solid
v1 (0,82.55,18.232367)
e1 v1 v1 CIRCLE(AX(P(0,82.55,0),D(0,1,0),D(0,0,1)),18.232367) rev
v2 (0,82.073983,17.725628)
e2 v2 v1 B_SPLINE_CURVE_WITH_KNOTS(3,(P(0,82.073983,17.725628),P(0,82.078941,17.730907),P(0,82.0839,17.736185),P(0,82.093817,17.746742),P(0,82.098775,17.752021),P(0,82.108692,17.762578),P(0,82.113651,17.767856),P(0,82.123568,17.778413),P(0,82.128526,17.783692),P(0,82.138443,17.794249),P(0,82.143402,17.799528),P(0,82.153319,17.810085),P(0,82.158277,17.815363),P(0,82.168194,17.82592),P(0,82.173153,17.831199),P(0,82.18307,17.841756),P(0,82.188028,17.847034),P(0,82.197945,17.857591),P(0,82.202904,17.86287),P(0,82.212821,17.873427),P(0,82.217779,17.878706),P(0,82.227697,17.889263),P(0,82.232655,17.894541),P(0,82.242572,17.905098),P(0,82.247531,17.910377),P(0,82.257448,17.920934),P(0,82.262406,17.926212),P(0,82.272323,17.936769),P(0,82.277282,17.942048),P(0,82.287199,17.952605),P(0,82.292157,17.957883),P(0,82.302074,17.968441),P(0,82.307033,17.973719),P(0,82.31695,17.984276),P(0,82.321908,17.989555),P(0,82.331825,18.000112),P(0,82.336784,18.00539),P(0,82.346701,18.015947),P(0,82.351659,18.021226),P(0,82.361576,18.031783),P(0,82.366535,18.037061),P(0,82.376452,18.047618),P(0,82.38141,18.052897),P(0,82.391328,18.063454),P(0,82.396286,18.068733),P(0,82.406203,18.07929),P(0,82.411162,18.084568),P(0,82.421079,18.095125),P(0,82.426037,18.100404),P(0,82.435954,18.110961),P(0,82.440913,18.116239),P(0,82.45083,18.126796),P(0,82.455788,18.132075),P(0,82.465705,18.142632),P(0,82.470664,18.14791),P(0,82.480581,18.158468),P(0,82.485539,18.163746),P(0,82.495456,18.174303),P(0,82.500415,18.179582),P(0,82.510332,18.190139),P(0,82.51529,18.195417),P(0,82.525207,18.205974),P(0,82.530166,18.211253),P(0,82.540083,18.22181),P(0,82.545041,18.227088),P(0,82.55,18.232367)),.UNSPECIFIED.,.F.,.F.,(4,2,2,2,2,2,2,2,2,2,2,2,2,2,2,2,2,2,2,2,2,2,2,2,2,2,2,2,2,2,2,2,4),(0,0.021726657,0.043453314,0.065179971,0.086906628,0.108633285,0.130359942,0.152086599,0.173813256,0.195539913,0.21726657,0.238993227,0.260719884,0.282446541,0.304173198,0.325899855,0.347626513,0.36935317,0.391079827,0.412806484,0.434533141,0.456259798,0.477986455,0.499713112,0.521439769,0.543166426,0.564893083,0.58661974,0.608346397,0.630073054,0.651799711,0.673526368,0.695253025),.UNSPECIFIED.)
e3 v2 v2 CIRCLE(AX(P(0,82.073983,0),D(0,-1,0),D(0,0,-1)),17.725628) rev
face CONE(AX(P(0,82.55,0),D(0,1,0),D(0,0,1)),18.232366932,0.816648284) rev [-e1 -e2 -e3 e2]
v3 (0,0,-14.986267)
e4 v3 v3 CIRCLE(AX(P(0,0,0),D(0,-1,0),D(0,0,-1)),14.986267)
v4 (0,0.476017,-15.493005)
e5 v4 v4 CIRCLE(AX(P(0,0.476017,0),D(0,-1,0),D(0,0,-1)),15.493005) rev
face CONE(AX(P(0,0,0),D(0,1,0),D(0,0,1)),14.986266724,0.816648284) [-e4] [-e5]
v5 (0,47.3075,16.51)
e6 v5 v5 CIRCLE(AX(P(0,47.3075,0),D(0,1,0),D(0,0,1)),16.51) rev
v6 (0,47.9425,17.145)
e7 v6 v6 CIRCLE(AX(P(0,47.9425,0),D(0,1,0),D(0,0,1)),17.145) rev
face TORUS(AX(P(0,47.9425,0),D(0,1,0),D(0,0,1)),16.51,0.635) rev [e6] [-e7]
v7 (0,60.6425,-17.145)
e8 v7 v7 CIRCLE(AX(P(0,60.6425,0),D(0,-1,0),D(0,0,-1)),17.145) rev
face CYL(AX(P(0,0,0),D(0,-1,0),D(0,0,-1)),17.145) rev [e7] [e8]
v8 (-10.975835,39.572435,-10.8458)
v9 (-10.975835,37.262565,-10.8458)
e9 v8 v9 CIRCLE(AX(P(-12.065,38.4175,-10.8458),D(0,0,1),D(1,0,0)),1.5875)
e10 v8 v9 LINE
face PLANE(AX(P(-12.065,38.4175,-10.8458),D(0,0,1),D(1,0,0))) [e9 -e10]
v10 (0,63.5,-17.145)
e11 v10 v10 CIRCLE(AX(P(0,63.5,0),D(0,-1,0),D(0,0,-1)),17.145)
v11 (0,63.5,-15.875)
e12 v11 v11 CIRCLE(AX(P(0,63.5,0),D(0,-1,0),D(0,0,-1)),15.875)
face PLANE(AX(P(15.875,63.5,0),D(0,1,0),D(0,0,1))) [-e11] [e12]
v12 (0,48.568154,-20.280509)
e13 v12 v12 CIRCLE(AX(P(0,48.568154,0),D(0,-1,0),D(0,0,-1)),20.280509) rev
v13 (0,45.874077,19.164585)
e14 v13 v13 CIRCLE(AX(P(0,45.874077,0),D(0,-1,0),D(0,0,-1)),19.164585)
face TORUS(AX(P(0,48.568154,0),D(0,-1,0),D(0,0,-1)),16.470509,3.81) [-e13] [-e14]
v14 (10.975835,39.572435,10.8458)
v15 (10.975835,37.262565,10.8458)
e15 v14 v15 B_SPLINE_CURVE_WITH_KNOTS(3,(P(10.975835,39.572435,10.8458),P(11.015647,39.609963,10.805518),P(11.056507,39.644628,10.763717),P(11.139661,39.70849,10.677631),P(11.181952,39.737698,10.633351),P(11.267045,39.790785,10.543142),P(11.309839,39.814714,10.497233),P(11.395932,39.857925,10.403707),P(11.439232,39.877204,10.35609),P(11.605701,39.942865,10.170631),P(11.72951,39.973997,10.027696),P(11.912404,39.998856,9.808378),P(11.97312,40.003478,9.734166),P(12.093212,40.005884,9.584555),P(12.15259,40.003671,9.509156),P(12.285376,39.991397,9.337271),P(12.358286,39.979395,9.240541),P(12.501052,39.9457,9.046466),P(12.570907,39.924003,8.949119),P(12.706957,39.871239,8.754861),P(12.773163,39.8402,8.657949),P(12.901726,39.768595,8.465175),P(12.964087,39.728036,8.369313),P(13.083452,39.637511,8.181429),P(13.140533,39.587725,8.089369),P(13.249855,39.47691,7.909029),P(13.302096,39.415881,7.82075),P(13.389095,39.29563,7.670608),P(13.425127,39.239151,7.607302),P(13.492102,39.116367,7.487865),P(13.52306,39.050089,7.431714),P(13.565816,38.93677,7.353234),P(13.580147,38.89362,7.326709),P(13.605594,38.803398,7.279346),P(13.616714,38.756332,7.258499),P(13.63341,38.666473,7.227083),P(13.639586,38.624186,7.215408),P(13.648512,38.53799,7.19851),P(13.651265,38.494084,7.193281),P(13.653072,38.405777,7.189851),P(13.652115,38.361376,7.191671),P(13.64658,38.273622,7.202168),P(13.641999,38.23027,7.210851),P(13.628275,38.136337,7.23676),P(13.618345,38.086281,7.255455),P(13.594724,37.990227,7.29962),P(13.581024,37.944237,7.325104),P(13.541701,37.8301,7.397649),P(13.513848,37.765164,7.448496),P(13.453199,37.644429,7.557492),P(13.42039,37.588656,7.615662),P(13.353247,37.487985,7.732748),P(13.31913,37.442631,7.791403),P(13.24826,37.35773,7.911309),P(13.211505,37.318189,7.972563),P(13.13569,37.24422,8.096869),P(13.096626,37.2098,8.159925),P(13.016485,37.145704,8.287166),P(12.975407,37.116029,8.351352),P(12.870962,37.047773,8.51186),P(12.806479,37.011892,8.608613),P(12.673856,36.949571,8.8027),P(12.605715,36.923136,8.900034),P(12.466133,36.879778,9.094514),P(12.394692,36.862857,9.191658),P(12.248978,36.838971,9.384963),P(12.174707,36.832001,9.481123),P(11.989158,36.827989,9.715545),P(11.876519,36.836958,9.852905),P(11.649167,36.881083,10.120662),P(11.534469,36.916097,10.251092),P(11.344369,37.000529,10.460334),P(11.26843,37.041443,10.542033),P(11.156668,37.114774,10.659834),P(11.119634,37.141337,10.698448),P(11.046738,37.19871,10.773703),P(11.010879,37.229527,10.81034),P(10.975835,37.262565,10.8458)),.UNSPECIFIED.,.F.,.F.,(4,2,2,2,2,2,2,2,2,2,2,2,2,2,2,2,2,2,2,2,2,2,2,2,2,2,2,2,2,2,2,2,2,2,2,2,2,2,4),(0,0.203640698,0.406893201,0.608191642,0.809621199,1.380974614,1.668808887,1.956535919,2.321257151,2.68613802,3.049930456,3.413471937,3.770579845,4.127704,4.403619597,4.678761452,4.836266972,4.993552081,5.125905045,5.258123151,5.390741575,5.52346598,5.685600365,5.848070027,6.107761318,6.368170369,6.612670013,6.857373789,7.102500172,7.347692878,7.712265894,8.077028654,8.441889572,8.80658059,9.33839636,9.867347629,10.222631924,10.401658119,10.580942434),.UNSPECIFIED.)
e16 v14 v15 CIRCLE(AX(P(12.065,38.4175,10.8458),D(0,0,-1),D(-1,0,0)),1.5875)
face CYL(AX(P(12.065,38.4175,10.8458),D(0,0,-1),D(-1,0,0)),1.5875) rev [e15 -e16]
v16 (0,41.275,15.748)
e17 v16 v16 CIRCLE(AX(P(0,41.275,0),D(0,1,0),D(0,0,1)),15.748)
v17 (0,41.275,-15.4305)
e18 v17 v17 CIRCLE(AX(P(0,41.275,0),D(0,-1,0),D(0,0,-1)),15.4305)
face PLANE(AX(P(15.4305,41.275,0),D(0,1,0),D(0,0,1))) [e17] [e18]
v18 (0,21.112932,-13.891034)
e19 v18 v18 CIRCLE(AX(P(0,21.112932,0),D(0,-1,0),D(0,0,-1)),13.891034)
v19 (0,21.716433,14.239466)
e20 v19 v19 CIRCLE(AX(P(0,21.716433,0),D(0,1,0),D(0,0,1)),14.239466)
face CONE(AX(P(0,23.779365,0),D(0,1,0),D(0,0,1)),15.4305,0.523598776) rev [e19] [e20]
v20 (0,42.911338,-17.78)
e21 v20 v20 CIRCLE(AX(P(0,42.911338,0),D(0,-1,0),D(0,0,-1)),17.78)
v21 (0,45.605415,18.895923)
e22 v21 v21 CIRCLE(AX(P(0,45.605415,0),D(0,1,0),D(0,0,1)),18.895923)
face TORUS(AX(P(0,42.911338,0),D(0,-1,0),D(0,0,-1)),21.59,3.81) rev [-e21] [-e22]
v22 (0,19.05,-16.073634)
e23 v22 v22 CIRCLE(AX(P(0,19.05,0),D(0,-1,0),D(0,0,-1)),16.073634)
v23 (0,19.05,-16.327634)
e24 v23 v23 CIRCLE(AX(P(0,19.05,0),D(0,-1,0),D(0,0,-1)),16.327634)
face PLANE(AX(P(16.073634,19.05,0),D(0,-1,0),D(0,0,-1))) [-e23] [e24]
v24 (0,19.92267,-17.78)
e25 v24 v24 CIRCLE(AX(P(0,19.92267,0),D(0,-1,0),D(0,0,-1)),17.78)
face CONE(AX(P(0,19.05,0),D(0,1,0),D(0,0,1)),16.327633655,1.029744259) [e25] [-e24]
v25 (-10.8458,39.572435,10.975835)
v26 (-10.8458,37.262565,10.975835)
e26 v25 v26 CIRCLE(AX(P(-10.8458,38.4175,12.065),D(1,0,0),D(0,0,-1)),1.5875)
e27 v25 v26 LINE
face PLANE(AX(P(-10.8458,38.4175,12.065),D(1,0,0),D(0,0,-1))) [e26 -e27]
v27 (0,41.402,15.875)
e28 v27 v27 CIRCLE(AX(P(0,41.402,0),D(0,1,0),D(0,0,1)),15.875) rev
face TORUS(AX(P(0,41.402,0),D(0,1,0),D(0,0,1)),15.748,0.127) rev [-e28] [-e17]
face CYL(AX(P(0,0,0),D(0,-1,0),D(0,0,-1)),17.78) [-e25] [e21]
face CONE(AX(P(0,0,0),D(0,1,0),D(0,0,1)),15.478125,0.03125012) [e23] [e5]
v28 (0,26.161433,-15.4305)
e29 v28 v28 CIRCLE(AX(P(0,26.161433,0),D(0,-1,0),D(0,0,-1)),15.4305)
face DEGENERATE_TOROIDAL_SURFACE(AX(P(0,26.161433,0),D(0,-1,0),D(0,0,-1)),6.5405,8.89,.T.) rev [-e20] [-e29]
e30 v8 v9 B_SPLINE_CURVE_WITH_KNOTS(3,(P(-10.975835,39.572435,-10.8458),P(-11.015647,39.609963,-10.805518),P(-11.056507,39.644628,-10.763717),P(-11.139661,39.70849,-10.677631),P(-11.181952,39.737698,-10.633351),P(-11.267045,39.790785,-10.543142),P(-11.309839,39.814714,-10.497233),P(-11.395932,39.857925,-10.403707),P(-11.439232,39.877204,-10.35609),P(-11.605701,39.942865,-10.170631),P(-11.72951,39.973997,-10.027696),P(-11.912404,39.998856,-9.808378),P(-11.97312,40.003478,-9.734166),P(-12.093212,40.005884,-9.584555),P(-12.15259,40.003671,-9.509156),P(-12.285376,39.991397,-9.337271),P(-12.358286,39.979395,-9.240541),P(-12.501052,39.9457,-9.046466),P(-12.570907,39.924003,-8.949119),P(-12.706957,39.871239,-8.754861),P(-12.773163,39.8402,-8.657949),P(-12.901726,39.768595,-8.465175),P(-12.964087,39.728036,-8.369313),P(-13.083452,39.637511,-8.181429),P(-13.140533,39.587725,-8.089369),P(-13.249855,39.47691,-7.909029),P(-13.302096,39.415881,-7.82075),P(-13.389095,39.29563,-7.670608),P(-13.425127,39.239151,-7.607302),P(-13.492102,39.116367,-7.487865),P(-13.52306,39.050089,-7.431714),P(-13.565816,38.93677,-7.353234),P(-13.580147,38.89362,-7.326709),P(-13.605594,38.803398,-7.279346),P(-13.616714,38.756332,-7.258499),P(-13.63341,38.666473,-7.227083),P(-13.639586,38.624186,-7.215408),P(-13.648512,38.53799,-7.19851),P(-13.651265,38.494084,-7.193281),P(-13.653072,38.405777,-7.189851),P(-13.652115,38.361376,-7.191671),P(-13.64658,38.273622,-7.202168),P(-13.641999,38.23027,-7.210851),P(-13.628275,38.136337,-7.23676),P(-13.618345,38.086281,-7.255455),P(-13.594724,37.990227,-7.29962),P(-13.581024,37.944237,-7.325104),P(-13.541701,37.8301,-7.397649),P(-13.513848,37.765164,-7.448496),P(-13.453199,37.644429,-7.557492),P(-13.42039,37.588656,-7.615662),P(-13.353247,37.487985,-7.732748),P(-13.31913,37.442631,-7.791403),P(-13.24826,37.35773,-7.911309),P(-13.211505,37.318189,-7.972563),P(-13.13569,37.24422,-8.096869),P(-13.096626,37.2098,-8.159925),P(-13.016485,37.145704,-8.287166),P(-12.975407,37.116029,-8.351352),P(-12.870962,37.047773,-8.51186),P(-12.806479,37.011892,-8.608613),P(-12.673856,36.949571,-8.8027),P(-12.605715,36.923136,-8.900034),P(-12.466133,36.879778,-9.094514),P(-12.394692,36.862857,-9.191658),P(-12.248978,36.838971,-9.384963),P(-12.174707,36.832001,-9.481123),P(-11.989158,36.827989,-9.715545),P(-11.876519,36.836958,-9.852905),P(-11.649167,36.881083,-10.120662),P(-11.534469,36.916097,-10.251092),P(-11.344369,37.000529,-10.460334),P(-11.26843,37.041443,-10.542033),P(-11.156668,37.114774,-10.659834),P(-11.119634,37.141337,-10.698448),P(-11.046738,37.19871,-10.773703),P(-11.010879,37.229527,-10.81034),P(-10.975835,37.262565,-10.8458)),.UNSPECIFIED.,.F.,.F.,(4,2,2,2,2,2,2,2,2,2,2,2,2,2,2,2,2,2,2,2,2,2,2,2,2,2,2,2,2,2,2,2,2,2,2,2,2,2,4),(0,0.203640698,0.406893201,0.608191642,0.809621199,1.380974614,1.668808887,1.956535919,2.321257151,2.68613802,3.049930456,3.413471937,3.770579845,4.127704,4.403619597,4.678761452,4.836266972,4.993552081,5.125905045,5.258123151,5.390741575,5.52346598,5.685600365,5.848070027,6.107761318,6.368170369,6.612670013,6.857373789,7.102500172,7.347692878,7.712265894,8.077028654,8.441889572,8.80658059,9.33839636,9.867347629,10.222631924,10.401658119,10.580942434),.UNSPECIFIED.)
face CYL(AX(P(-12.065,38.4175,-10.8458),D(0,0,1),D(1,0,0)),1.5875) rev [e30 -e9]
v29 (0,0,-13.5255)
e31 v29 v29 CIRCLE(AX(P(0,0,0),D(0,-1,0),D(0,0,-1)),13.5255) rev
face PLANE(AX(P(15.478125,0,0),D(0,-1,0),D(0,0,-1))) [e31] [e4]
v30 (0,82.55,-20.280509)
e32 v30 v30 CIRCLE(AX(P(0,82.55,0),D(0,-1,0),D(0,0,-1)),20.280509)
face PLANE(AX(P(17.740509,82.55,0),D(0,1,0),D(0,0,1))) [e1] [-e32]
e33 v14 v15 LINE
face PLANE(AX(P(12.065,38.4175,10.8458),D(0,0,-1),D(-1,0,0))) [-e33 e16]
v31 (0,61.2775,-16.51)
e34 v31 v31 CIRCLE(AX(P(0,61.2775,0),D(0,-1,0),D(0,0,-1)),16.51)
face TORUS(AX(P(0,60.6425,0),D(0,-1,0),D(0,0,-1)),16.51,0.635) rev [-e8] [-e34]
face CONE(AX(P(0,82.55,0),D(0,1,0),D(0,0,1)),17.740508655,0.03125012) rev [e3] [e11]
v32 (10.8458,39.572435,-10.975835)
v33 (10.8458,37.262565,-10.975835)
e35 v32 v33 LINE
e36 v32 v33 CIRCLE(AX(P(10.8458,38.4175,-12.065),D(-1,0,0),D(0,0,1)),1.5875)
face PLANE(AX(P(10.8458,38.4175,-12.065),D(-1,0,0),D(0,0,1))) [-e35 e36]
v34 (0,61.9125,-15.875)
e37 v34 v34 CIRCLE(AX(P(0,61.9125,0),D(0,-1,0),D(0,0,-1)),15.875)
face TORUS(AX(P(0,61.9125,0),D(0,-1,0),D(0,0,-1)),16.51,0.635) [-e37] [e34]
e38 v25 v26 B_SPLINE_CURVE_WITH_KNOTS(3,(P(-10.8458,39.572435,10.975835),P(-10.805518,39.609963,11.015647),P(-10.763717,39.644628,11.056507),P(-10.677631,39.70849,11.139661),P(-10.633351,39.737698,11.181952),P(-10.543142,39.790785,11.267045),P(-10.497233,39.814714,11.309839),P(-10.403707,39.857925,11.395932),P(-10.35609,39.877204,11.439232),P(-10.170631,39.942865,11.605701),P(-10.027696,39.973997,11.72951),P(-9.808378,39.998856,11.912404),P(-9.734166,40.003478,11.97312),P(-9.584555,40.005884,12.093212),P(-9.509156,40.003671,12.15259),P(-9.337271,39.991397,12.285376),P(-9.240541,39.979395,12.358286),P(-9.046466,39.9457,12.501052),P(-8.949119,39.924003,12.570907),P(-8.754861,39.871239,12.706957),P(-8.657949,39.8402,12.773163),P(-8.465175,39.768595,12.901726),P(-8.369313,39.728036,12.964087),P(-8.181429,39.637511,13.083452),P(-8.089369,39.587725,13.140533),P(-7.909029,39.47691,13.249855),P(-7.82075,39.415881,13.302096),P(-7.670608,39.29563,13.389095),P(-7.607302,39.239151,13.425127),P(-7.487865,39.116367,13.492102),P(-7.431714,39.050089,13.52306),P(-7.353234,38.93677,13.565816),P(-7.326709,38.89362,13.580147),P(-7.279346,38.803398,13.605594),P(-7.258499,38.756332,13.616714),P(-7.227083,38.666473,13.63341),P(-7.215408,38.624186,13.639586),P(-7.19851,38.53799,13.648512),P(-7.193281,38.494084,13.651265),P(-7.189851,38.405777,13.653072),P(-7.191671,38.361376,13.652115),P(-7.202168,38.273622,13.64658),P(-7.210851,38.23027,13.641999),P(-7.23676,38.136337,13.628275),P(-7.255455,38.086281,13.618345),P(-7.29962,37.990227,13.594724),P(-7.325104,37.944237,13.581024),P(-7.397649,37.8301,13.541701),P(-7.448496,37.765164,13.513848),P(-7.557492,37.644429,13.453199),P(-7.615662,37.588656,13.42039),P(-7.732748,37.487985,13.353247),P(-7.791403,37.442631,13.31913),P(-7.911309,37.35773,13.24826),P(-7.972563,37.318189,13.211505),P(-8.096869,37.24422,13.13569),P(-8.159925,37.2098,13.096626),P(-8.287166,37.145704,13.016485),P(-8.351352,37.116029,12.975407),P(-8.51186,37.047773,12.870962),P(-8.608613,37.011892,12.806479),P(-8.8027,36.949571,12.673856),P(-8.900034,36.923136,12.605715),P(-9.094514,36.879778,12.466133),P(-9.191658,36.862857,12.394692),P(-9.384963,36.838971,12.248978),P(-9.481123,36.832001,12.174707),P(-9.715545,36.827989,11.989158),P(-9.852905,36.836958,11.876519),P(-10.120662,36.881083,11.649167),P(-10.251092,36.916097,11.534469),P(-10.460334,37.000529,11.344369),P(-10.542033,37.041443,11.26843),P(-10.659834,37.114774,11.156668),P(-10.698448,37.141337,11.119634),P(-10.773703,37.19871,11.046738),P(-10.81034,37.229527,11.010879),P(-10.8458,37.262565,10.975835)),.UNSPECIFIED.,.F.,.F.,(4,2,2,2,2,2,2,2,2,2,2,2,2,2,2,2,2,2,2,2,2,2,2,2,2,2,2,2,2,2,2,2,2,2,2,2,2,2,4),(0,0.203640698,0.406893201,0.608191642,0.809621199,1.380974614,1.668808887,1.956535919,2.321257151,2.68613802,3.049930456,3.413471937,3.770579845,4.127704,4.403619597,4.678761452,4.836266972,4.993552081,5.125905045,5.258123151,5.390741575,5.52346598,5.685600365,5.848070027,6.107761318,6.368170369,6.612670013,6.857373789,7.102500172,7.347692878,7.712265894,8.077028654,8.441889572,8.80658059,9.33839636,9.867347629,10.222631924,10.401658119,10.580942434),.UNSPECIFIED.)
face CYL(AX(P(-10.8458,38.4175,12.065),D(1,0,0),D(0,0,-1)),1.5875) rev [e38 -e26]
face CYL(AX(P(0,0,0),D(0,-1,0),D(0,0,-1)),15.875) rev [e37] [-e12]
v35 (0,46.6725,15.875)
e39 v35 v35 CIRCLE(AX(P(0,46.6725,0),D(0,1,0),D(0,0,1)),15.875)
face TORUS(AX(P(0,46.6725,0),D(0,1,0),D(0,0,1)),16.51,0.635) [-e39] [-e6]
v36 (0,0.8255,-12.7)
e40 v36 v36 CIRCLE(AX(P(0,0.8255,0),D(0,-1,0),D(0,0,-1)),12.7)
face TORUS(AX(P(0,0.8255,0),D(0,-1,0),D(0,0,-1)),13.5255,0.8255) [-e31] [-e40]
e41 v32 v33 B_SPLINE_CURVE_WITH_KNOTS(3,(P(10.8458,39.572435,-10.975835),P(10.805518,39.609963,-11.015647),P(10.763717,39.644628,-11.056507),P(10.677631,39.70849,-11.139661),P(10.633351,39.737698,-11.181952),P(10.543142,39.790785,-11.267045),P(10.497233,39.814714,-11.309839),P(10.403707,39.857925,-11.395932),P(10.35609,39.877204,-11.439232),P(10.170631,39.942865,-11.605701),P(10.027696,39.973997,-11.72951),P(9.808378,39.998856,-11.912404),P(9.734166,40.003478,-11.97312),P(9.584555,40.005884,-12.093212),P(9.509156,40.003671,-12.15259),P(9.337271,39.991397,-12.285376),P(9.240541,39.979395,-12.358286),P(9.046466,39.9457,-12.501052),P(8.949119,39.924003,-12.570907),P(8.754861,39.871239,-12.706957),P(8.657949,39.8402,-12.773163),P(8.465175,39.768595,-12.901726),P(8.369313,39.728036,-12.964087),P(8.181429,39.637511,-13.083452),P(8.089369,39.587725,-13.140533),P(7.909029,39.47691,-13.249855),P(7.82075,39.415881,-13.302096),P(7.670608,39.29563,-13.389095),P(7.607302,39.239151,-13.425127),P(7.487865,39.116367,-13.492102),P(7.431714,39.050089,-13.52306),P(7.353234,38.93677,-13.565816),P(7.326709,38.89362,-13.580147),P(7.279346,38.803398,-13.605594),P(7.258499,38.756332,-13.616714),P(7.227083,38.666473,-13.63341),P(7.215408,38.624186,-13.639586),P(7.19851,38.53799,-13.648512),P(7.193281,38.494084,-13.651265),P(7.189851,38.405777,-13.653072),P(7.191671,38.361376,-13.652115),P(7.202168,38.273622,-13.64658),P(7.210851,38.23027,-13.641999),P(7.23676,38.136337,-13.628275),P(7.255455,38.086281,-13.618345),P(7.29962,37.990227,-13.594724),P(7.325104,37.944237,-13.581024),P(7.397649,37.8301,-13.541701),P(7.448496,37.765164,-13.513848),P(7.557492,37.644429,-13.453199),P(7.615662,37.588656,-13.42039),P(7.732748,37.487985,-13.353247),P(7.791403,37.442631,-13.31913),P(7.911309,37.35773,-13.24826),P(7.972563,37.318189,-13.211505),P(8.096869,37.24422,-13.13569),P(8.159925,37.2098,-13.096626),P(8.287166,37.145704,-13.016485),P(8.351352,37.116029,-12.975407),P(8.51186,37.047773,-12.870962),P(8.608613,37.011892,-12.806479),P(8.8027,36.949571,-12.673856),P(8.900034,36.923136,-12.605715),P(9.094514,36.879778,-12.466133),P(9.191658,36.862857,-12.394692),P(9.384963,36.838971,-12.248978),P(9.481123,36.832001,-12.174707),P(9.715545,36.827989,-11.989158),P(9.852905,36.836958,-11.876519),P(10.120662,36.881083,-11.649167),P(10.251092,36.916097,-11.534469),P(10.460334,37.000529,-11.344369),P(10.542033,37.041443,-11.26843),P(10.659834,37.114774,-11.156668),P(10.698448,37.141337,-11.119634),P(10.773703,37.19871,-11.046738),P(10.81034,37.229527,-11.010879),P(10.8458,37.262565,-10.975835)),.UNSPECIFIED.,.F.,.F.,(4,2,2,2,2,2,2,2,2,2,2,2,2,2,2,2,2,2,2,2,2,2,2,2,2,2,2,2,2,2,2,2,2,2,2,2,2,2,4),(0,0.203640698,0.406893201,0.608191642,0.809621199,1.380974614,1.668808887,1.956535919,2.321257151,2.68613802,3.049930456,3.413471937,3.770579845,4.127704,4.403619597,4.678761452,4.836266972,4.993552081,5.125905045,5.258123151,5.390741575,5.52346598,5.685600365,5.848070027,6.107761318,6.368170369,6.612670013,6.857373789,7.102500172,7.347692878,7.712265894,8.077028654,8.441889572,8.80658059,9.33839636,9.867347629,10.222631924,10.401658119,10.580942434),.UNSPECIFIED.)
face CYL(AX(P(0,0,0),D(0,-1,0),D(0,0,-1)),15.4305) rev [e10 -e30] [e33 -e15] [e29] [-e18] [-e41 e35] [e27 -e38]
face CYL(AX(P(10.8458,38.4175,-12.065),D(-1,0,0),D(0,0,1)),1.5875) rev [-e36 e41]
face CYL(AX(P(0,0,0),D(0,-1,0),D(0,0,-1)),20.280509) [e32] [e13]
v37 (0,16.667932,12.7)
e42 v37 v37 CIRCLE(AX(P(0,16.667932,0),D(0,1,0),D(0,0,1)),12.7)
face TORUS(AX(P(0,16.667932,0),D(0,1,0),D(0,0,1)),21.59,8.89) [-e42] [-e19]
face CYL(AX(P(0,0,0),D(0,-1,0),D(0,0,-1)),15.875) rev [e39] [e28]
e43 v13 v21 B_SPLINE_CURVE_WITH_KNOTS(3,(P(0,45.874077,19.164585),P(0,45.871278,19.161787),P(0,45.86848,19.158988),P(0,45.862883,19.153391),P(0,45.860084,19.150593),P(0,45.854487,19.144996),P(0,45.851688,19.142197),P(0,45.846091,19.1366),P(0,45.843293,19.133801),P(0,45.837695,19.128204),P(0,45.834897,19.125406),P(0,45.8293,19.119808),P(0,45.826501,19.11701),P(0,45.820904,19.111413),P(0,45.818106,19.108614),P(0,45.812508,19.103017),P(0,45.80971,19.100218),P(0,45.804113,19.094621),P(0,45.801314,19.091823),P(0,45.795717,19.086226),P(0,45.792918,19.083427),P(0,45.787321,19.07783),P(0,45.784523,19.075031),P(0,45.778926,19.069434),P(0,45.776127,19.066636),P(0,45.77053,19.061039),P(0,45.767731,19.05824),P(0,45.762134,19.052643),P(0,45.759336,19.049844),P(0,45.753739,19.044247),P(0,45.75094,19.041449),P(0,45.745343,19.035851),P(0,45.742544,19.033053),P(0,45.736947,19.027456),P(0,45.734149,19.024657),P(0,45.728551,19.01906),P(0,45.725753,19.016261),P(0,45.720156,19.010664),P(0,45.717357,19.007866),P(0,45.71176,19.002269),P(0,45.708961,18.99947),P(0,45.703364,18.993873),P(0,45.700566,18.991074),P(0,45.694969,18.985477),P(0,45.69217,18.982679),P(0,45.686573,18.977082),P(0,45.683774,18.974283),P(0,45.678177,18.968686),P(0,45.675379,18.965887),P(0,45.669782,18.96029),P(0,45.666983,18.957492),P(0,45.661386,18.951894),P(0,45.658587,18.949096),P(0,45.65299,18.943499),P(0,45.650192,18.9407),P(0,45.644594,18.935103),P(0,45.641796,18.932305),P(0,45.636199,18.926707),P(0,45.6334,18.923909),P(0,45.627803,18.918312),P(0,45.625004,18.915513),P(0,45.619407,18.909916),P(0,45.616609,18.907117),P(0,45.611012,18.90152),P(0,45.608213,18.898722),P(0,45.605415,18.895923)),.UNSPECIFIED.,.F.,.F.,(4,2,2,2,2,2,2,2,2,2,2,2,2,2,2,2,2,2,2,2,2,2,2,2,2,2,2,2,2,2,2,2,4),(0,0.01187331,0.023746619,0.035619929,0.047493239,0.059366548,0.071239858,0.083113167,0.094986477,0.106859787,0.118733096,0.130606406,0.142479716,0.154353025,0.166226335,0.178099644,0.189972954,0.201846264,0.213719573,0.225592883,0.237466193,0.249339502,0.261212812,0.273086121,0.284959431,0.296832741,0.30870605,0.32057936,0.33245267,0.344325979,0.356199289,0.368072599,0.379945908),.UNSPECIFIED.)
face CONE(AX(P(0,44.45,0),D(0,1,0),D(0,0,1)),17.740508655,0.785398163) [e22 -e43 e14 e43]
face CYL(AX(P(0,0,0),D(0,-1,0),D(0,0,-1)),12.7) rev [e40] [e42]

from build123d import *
from OCP.BRepFilletAPI import BRepFilletAPI_MakeChamfer

# Parameters (mm, degrees)
SKETCH5_R                = 1.5875
FUEL_INLET_DEPTH         = 10.8458
FUEL_INLET_PATTERN_COUNT = 4
THREAD_PREP_SIZE         = 0.47625
THREAD_PREP_SIZE2        = 0.491858276
OUTSIDE_PREP_ROUND_SIZE  = 2.54
OUTER_ROUND_R            = 3.81
INSIDE_ROUND_R           = 8.89
STEP_ROUND_R             = 0.127
GROOVE_ROUNDS_R          = 0.635
EXIT_ROUND_R             = 0.8255


# Some blends are built 0.0001 mm under size
with BuildPart() as part:
    # Sketch3 → Revolve1 (revolve)
    with BuildSketch(Plane.XY, mode=Mode.PRIVATE) as revolve1_sk:
        Polygon((15.4305, 23.77936473), (15.4305, 41.275), (15.875, 41.275), (15.875, 47.3075), (17.145, 47.3075), (17.145, 61.2775), (15.875, 61.2775), (15.875, 63.5), (17.145, 63.5), (17.740508655, 82.55), (20.280508655, 82.55), (20.280508655, 44.45), (17.78, 44.45), (17.78, 19.922669741), (16.327633655, 19.05), (16.073633655, 19.05), (15.478125, 0), (12.7, 0), (12.7, 19.05), align=None)
    revolve(revolve1_sk.sketch.rotate(Axis((0, 0, 0), (0, 1, 0)), 90), axis=Axis((0, 0, 0), (0, 1, 0)))

    # Sketch5 → Fuel-Inlet (cut)
    with BuildSketch(Plane.XY):
        with Locations((-12.065, 38.4175)):
            Circle(SKETCH5_R)
    fuel_inlet = extrude(amount=-FUEL_INLET_DEPTH, mode=Mode.SUBTRACT)

    # Fuel-Inlet_Pattern: Fuel-Inlet ×4 about axis
    fuel_inlet_pattern_axis = Axis((0, 0, 0), (0, 1, 0))
    for i in range(1, FUEL_INLET_PATTERN_COUNT):
        add(fuel_inlet.rotate(fuel_inlet_pattern_axis, i * 360 / FUEL_INLET_PATTERN_COUNT), mode=Mode.SUBTRACT)

    # Thread_Prep: one chamfer whose edges measure the first distance from different faces: ONE call of the kernel's chamfer builder (chamfer() names one face for all edges)
    thread_prep_edges_1 = [part.edges().sort_by_distance(p)[0] for p in [
        (0, 0, 15.478125),
    ]]
    thread_prep_side_1 = [part.faces().sort_by_distance(p)[0] for p in [
        (0, 9.525, 15.775879328),
    ]]
    thread_prep_edges_2 = [part.edges().sort_by_distance(p)[0] for p in [
        (0, 82.55, 17.740508655),
    ]]
    thread_prep_side_2 = [part.faces().sort_by_distance(p)[0] for p in [
        (0, 73.025, 17.442754328),
    ]]
    thread_prep = BRepFilletAPI_MakeChamfer(part.part.solid().wrapped)
    for e in thread_prep_edges_1:
        thread_prep.Add(THREAD_PREP_SIZE, THREAD_PREP_SIZE2, e.wrapped, thread_prep_side_1[0].wrapped)  # the first distance lies on this face
    for e in thread_prep_edges_2:
        thread_prep.Add(THREAD_PREP_SIZE, THREAD_PREP_SIZE2, e.wrapped, thread_prep_side_2[0].wrapped)  # the first distance lies on this face
    add(Compound.cast(thread_prep.Shape()), mode=Mode.REPLACE)

    # Outside Prep Round
    # the kernel refuses this chamfer: 2.54 mm, written as the material it takes off along each edge
    with BuildSketch(Plane(origin=(0, 44.45, 0), x_dir=(0, 0, -1), z_dir=(1, 0, 0))) as outside_prep_round_piece_1_section:
        Polygon((20.280508655 - OUTSIDE_PREP_ROUND_SIZE, 0), (20.280508655, OUTSIDE_PREP_ROUND_SIZE), (20.280508655, 0), align=None)
    outside_prep_round_piece_1 = revolve(axis=Axis((0, 44.45, 0), (0, 1, 0)), mode=Mode.PRIVATE)
    outside_prep_round_piece_1 = outside_prep_round_piece_1 - Plane(origin=(0, 45.722196626, 0), x_dir=(0, 0, -1), z_dir=(0, -1, 0)) * Cylinder(17.78, 82, mode=Mode.PRIVATE)
    add(outside_prep_round_piece_1, mode=Mode.SUBTRACT)

    # Outer Round
    outer_round_edges = [part.edges().sort_by_distance(p)[0] for p in [
        (0, 46.99, 20.280508655),
        (0, 44.489491345, 17.78),
    ]]
    fillet(outer_round_edges, radius=OUTER_ROUND_R)

    # Inside Round
    inside_round_edges = [part.edges().sort_by_distance(p)[0] for p in [
        (0, 23.77936473, 15.4305),
        (0, 19.05, 12.7),
    ]]
    fillet(inside_round_edges, radius=INSIDE_ROUND_R)

    # Step Round
    step_round_edges = [part.edges().sort_by_distance(p)[0] for p in [
        (0, 41.275, 15.875),
    ]]
    fillet(step_round_edges, radius=STEP_ROUND_R)

    # Groove Rounds
    groove_rounds_edges = [part.edges().sort_by_distance(p)[0] for p in [
        (0, 61.2775, 15.875),
        (0, 61.2775, 17.145),
        (0, 47.3075, 17.145),
        (0, 47.3075, 15.875),
    ]]
    fillet(groove_rounds_edges, radius=GROOVE_ROUNDS_R - 0.0001)  # a hair under: the kernel refuses the full size

    # Exit Round
    exit_round_edges = [part.edges().sort_by_distance(p)[0] for p in [
        (0, 0, 12.7),
    ]]
    fillet(exit_round_edges, radius=EXIT_ROUND_R)


solid = part.part
